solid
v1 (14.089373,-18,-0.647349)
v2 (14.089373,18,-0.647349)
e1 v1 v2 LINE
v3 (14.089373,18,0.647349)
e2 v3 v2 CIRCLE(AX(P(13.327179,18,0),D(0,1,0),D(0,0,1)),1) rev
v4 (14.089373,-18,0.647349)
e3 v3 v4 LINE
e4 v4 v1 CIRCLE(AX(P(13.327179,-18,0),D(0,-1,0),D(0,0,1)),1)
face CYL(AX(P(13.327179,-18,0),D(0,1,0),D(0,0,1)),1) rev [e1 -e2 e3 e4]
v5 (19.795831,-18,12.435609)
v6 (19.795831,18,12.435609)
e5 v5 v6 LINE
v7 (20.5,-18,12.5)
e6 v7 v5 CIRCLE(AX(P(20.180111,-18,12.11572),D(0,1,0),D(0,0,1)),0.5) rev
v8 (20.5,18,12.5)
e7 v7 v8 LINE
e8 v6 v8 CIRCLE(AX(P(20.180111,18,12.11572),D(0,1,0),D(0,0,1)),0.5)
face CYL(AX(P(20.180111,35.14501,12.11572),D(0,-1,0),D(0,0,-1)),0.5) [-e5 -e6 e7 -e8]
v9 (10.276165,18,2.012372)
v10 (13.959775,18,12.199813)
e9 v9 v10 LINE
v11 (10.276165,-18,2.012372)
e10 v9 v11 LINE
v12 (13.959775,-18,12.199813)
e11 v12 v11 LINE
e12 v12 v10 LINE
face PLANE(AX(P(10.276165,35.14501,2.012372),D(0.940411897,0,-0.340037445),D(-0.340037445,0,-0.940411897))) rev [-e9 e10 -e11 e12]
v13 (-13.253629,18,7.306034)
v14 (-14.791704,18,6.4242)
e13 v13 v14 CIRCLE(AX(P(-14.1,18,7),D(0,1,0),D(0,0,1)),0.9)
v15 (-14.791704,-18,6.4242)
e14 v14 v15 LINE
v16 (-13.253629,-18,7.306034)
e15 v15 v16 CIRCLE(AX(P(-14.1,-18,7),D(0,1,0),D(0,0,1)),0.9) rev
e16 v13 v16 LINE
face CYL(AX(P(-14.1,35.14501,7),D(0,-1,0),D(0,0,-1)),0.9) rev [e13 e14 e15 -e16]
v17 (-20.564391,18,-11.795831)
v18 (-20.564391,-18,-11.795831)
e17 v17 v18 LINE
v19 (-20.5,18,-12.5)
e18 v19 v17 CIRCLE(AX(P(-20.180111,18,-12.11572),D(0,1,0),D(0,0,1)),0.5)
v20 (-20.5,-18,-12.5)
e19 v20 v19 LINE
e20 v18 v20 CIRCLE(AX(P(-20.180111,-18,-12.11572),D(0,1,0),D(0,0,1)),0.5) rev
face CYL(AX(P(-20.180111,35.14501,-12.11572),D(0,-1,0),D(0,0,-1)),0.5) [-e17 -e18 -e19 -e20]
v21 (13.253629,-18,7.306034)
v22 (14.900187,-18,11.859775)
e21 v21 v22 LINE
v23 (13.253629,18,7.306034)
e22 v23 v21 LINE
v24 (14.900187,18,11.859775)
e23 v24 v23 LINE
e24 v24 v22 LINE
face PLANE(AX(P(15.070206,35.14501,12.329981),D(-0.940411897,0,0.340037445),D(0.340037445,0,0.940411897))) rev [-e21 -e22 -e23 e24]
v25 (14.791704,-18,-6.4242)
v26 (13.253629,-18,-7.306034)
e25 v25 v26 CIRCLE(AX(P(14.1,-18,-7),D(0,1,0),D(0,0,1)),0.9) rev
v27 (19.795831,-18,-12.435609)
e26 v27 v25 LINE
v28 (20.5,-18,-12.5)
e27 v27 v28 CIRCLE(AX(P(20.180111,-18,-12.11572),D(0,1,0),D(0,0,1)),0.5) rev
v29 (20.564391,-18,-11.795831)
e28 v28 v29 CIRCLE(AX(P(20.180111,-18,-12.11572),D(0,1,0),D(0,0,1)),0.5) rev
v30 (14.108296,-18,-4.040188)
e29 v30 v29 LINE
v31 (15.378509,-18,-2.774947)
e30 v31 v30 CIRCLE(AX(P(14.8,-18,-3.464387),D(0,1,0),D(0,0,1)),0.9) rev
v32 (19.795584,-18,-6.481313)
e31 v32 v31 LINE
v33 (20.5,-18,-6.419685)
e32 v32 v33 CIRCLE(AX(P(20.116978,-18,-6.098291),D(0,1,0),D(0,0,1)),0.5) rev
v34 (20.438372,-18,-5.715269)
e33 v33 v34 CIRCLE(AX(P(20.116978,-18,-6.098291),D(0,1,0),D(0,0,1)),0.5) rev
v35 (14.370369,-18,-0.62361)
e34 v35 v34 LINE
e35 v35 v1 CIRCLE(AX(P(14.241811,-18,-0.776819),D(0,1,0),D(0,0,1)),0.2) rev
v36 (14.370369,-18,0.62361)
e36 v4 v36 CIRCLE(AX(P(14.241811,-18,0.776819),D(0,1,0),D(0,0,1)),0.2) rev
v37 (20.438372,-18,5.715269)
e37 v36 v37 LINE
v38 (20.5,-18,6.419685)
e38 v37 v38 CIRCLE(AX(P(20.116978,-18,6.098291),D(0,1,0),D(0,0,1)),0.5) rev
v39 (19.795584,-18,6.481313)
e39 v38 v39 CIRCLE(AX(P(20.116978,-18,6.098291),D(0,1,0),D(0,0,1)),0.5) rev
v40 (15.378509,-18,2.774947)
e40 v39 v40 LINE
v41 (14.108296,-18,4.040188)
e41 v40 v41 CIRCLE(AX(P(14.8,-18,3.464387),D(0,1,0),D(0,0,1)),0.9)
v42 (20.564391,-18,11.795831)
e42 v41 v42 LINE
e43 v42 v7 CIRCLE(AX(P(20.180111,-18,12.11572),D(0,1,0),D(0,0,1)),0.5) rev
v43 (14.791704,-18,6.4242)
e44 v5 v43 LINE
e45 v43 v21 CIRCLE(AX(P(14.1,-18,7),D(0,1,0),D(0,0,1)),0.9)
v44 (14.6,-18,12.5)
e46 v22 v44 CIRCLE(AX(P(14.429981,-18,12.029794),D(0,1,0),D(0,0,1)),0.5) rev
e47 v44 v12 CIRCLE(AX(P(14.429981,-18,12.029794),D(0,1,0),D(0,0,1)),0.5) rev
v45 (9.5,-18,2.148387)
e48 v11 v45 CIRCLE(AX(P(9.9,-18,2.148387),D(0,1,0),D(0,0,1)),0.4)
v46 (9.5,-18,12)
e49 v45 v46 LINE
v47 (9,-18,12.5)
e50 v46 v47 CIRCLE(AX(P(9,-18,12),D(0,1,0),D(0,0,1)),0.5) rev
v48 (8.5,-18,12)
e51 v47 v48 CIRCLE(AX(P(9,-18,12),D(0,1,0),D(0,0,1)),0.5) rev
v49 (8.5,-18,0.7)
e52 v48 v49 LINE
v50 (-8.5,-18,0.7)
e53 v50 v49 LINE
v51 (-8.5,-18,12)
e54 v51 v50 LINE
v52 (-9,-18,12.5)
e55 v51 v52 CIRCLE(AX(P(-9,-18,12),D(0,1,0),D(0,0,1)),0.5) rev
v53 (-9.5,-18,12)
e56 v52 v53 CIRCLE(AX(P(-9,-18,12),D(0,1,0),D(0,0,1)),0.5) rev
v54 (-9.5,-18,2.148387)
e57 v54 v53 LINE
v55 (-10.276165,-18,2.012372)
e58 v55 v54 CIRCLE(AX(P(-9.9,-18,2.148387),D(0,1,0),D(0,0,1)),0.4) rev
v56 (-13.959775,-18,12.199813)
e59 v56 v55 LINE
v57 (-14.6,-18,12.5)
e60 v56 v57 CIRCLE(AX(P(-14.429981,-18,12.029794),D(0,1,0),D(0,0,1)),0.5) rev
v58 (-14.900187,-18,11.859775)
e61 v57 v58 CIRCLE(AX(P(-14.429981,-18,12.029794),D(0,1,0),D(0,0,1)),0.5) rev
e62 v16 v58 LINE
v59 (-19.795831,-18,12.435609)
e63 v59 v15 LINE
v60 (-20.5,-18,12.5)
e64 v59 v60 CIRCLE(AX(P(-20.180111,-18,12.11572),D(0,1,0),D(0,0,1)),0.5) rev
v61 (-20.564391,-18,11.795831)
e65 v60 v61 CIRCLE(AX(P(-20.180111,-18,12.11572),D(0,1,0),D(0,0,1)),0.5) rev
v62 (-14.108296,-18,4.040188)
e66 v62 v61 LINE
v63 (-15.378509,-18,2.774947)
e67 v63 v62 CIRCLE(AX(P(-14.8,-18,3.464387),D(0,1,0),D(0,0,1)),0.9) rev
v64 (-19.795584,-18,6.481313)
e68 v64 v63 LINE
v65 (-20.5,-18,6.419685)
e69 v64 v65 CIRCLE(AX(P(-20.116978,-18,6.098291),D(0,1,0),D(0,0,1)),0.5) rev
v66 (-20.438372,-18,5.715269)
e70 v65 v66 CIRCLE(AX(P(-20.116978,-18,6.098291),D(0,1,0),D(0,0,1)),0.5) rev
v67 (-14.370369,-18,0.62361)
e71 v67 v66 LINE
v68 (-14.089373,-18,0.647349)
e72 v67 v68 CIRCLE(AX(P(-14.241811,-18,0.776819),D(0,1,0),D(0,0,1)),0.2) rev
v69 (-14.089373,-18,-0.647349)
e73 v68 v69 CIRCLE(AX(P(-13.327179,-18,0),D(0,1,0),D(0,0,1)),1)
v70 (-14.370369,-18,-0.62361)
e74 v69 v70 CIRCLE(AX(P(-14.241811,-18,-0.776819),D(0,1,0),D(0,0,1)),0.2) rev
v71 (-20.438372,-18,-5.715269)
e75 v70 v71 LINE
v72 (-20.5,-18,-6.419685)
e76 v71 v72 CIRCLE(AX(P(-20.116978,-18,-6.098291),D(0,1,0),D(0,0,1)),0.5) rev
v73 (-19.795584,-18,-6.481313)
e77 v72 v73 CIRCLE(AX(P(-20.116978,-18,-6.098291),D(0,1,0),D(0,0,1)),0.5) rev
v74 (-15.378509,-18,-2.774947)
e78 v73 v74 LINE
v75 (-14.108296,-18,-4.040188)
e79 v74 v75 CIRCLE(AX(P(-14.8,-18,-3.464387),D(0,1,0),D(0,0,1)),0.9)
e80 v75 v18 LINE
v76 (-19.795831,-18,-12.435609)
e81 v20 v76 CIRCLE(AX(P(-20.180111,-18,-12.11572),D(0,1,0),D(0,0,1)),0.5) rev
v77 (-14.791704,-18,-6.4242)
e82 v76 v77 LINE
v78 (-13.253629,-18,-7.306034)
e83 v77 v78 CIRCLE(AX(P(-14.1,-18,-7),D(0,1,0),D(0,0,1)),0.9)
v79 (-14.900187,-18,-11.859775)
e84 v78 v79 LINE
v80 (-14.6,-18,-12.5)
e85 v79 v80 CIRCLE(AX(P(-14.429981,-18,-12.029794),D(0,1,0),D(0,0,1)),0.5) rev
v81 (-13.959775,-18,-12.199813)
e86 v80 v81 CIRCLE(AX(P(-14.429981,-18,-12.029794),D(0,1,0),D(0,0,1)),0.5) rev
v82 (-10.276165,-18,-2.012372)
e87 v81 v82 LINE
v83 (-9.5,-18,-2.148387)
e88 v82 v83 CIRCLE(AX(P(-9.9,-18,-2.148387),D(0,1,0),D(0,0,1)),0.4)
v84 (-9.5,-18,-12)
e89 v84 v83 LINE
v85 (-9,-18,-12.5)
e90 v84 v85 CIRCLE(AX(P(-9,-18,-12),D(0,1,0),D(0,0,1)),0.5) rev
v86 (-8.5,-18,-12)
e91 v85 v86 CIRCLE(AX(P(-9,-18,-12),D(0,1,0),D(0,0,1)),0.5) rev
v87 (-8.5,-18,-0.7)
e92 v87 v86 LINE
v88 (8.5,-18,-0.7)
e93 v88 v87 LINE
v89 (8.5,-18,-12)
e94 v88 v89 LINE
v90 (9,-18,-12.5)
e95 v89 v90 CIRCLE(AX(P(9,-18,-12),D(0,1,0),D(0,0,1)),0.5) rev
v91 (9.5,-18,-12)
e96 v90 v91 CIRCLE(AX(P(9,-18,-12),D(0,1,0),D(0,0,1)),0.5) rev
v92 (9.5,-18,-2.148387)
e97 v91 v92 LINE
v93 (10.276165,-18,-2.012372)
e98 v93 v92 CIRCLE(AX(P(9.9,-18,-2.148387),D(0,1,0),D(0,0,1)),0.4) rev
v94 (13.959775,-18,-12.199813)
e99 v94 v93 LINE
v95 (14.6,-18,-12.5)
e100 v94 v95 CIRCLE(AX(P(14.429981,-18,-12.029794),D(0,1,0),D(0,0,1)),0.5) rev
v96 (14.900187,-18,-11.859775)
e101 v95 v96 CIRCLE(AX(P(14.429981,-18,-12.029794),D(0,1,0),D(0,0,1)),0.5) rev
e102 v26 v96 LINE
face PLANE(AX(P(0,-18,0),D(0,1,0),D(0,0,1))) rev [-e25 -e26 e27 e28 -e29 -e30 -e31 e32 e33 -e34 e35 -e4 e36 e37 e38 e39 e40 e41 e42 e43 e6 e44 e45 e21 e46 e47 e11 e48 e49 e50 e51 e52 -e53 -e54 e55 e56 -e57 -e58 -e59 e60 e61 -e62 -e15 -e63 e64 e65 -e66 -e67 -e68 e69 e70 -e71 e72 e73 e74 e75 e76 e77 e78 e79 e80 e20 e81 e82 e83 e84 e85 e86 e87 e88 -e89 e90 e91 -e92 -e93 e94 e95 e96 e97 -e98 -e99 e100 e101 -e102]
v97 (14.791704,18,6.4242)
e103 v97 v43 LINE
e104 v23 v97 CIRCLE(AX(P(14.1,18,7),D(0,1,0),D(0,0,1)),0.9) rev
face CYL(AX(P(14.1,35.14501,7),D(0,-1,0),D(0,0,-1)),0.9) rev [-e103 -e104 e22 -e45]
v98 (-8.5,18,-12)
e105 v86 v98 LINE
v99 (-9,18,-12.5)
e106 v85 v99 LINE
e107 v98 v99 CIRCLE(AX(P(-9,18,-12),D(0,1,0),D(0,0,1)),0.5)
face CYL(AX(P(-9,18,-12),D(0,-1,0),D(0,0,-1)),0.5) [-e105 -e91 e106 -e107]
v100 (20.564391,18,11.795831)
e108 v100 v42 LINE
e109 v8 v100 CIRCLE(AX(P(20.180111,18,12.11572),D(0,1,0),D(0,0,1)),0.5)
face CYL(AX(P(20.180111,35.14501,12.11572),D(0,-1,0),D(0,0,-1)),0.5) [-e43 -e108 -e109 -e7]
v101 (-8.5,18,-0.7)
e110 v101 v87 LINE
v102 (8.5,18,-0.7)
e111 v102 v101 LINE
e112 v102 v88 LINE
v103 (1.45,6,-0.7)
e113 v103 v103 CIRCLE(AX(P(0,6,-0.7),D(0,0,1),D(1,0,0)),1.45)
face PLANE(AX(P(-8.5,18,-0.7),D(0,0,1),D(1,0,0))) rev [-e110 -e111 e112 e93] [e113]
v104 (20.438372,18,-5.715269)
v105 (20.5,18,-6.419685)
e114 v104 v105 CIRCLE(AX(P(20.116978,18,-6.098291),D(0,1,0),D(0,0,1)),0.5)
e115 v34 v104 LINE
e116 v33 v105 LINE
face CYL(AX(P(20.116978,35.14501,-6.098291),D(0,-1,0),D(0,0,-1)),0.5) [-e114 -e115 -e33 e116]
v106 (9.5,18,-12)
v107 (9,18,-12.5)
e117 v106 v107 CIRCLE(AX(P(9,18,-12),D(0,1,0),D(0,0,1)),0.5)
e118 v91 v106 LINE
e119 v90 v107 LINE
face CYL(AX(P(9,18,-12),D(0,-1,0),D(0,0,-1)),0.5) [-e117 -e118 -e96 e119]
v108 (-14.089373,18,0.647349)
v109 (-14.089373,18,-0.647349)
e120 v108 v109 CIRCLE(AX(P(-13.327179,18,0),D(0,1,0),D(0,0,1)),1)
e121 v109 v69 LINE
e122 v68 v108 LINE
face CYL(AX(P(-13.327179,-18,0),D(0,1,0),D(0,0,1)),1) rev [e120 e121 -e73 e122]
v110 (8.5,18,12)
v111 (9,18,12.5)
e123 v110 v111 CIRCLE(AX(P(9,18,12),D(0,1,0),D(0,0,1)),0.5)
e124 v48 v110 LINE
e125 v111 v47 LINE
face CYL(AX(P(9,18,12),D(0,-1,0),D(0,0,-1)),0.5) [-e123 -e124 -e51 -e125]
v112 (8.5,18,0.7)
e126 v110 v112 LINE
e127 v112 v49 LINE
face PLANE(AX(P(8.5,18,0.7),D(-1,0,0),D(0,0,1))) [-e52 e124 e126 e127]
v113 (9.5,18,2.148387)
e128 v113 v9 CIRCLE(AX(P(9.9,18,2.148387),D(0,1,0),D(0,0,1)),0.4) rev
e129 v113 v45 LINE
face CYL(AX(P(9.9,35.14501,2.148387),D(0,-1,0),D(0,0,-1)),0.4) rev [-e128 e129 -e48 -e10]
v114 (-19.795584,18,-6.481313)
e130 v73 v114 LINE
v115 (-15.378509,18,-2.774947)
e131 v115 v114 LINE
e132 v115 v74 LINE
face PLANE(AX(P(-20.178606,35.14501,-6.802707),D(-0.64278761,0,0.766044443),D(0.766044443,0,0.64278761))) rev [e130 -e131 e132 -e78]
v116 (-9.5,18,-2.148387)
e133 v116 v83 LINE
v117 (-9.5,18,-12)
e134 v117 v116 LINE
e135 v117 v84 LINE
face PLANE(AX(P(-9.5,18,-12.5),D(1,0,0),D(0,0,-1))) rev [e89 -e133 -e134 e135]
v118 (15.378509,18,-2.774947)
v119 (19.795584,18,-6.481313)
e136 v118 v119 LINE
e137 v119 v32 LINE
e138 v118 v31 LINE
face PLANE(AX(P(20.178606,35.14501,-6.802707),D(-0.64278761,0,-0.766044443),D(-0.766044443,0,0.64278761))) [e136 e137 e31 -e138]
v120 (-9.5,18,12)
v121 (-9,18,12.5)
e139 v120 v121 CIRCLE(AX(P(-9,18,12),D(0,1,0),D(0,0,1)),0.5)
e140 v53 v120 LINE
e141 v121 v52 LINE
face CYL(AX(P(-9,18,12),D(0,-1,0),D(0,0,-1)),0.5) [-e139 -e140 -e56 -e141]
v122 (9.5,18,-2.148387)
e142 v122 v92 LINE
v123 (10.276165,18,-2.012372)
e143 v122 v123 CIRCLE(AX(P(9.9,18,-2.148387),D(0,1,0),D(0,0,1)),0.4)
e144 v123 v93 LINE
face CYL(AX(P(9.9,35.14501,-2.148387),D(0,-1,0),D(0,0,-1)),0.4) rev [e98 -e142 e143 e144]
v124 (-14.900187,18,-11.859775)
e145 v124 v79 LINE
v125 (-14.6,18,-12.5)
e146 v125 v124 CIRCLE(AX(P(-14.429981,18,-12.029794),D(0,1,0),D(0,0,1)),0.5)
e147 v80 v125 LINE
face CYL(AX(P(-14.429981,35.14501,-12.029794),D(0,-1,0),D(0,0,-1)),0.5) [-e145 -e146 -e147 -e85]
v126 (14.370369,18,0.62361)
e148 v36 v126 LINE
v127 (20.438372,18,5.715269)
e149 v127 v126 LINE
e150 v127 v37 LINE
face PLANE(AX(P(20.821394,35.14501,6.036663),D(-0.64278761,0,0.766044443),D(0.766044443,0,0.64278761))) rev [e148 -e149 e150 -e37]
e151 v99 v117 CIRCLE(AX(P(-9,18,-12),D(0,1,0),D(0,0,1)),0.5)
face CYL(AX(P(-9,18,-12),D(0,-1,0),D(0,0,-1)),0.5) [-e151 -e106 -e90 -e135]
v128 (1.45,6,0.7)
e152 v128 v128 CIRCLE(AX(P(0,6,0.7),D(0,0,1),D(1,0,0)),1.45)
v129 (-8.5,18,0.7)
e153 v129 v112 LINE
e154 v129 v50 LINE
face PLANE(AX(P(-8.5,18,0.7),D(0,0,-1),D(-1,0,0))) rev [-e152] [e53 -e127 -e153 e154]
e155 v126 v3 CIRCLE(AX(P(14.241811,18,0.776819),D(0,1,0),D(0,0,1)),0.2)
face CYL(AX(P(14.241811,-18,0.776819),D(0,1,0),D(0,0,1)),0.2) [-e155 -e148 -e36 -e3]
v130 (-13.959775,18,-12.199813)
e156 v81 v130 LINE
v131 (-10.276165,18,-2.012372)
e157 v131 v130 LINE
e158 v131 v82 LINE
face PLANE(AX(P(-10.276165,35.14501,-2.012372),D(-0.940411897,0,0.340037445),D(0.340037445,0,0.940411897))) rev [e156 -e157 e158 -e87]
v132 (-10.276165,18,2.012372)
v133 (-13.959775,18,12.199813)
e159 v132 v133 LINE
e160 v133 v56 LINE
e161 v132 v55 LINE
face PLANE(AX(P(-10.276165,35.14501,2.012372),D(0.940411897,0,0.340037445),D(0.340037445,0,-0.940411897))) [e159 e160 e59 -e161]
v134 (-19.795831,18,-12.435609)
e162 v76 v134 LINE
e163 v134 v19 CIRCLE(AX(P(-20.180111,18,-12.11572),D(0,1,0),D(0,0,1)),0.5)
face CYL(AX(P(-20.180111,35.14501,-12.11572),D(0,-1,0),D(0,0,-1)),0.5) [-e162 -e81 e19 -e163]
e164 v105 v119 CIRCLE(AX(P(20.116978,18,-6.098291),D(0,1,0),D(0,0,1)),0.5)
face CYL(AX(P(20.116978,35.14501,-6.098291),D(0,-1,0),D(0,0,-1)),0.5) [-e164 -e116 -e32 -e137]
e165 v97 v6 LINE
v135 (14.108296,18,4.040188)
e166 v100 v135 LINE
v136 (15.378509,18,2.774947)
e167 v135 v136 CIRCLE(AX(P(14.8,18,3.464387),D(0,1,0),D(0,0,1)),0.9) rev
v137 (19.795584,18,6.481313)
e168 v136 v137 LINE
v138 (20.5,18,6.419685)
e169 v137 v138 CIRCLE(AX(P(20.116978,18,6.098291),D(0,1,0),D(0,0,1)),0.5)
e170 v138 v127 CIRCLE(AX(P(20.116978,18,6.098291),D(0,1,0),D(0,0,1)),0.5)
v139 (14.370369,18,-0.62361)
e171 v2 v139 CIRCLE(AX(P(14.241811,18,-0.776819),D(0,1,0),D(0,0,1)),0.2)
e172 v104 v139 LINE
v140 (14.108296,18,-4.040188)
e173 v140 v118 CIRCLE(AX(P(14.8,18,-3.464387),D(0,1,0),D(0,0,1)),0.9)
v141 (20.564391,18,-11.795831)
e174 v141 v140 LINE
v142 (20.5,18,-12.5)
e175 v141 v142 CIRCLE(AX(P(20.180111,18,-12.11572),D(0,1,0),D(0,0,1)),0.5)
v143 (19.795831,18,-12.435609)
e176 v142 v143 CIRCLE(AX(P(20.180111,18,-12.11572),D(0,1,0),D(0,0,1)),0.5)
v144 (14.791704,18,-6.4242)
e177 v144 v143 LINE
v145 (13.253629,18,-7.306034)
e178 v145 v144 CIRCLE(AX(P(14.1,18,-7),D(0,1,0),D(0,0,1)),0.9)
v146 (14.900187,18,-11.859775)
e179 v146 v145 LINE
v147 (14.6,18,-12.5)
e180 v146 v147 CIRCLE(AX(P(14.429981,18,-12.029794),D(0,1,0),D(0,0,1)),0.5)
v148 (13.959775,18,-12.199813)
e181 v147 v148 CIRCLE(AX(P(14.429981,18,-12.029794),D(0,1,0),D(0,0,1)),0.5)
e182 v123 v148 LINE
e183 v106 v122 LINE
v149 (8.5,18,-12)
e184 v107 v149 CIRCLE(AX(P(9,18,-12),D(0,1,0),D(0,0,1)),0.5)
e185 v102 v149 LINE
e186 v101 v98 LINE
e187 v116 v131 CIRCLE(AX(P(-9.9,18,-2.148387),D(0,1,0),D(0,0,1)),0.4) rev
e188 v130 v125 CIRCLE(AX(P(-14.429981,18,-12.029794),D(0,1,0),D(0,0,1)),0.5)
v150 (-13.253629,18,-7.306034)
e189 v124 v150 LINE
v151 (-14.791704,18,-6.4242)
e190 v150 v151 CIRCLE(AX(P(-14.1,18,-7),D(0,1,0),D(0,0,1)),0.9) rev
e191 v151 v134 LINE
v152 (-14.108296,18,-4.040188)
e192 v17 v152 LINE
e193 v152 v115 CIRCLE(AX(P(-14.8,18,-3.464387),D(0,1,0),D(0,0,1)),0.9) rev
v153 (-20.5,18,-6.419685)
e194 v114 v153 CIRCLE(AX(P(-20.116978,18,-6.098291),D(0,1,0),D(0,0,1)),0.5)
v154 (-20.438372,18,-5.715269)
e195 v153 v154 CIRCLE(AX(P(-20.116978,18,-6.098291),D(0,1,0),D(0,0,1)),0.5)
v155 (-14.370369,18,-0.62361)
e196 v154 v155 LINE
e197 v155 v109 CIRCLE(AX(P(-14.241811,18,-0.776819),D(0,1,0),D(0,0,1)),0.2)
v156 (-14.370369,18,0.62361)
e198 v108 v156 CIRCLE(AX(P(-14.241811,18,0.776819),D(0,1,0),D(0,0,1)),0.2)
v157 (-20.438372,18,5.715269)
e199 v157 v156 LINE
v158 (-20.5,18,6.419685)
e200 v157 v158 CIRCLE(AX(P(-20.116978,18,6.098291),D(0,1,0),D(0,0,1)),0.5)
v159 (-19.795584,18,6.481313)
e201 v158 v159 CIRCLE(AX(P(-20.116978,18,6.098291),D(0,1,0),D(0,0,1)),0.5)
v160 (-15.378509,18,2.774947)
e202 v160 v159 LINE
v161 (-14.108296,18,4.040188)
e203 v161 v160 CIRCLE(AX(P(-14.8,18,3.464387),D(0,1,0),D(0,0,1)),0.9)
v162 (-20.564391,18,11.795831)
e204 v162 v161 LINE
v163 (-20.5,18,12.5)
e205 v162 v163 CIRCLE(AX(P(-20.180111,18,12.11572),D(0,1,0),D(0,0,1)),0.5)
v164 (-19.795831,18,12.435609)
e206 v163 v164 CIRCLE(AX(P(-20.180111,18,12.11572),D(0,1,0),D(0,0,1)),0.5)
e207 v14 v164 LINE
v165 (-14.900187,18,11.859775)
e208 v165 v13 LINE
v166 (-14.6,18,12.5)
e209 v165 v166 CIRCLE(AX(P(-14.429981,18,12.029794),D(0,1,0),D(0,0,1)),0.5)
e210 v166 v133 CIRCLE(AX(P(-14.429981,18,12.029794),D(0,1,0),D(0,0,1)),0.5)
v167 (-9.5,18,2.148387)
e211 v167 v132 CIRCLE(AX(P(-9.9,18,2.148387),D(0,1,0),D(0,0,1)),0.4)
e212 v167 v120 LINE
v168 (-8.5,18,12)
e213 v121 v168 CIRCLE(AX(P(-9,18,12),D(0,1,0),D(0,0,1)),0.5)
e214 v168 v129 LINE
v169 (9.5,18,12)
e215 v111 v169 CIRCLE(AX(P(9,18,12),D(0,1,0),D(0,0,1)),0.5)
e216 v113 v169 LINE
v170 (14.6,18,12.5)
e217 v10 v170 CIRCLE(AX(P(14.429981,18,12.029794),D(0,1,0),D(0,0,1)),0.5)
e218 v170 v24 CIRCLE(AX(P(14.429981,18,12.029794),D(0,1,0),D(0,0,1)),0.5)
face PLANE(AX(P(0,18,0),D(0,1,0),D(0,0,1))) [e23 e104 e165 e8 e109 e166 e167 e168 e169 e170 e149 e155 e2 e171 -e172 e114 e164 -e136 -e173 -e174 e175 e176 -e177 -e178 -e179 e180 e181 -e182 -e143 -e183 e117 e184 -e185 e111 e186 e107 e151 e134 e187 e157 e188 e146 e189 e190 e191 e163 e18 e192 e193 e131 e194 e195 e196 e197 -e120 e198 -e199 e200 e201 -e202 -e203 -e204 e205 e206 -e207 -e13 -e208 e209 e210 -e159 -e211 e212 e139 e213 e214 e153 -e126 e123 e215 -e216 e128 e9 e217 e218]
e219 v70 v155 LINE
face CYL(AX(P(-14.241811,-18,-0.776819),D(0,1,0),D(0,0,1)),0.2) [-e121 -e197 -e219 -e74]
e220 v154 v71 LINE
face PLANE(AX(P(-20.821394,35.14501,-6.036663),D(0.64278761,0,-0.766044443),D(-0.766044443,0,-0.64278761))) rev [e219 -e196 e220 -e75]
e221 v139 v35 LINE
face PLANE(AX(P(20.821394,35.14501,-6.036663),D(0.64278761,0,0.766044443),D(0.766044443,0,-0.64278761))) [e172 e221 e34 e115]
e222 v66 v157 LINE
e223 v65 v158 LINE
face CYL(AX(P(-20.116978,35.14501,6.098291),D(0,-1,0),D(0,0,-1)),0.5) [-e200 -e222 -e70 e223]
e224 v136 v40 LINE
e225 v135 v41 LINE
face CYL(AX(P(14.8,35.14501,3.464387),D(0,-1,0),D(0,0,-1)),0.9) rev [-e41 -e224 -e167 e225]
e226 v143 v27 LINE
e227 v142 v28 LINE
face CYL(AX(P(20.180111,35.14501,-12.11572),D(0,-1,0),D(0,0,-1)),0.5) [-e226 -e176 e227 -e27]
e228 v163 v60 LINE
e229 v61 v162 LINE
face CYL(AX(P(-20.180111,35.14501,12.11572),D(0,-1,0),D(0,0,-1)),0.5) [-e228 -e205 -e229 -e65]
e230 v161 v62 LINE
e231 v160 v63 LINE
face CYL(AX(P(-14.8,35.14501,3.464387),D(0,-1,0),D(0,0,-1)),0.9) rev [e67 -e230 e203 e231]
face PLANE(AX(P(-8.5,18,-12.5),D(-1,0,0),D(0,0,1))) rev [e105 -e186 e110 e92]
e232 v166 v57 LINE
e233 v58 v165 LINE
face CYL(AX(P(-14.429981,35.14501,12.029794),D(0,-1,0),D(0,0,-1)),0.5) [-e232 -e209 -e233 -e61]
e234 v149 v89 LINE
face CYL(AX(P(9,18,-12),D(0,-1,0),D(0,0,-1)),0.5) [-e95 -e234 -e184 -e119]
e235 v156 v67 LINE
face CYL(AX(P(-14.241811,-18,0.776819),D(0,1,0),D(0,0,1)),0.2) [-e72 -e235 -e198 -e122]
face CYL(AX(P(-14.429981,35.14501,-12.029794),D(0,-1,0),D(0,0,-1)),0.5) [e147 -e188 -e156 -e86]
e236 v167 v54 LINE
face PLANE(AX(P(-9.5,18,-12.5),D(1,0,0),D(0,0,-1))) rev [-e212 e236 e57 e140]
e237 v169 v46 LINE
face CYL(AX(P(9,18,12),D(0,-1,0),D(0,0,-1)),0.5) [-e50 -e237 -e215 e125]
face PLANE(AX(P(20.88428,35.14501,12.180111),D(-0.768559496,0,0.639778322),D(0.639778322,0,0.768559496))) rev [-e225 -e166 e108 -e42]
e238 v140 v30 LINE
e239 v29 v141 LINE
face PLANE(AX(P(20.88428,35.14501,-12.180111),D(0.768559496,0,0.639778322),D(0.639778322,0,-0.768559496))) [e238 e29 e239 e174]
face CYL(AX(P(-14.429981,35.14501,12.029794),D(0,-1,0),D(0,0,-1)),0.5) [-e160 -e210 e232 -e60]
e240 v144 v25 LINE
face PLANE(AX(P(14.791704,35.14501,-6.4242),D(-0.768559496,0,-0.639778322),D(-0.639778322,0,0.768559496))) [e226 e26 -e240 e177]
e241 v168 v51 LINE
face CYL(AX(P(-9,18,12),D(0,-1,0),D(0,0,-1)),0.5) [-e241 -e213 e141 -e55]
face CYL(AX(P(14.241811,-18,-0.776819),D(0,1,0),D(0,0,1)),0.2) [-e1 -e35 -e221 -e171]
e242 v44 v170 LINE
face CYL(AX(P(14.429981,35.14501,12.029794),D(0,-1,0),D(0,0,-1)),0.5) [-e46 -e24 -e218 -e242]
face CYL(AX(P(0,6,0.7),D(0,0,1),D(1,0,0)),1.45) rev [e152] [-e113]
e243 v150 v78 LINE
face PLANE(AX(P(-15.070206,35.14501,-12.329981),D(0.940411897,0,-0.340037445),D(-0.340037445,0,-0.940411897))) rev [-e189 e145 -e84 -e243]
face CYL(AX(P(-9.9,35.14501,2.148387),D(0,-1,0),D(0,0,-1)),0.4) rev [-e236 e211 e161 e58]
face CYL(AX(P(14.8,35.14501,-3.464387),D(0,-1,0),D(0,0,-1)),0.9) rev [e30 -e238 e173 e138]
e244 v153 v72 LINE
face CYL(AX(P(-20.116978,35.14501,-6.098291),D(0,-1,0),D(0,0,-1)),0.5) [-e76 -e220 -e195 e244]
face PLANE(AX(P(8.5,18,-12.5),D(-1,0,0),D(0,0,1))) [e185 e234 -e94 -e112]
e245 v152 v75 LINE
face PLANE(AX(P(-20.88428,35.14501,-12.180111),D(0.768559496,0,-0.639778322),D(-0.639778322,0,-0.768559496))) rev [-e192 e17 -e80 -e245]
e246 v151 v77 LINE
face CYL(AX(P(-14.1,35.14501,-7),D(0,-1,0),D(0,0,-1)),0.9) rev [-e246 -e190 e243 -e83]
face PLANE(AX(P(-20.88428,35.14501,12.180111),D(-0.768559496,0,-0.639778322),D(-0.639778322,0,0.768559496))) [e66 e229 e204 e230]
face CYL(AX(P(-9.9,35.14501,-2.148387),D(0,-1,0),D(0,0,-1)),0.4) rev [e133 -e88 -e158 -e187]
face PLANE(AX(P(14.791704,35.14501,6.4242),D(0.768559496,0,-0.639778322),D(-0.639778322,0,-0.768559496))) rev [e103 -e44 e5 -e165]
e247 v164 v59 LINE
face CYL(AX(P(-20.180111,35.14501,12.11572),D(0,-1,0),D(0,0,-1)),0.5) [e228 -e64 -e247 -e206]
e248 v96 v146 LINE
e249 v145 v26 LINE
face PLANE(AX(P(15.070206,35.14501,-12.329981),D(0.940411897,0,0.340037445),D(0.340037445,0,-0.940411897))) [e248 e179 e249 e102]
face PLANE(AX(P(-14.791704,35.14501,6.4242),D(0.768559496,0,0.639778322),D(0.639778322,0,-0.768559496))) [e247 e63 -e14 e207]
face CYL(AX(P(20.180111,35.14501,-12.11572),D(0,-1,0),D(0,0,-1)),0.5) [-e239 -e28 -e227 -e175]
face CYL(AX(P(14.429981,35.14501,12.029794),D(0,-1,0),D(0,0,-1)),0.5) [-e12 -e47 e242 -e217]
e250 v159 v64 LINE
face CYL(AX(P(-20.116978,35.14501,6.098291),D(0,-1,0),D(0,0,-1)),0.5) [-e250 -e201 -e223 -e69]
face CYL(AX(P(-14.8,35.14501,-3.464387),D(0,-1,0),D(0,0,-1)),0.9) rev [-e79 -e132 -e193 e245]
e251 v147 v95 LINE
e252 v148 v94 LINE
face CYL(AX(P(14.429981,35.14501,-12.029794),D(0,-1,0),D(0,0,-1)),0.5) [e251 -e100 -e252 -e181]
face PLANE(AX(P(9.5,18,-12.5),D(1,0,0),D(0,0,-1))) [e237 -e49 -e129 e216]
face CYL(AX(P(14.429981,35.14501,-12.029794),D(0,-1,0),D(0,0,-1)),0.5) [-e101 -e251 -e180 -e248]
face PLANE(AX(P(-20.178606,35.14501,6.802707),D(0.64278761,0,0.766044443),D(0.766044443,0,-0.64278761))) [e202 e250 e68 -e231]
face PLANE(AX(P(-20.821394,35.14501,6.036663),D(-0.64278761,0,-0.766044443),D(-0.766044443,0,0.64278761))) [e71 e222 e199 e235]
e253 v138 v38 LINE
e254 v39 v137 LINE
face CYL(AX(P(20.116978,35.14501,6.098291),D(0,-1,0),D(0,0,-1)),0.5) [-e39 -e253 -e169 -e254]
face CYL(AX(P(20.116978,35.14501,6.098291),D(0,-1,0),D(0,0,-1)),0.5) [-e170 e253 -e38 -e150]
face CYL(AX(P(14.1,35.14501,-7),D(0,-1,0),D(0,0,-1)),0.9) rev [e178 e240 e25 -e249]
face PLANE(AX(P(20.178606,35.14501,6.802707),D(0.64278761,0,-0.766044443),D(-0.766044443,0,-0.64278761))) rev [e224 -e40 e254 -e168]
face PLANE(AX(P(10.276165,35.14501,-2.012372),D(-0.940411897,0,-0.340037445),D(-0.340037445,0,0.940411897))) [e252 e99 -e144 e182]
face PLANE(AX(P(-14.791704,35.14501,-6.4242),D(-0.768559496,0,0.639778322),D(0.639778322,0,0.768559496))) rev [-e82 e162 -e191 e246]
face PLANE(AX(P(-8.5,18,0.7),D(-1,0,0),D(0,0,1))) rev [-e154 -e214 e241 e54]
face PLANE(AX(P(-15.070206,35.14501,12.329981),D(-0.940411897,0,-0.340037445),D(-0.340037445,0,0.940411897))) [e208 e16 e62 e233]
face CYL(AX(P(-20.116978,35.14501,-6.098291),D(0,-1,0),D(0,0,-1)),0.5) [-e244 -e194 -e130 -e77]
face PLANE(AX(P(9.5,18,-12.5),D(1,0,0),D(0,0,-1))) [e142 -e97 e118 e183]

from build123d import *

# Parameters (mm, degrees)
INNER_HALF_DEPTH          = 18
FLANGES_REACH             = 25.885
FLANGES_DIRECTION_2_REACH = 25.885
FILLET1_R                 = 0.5
FILLET1_OF_MIRROR1_R      = 0.5
MIRROR3_START             = -18
MIRROR3_DEPTH             = 36
SKETCH3_R                 = 1
INNER_CIRCLE_DEPTH        = 44.391544118
M3_5X0_6_TAPPED_HOLE1_D   = 2.9
FILLET3_R                 = 0.2
FILLET2_R                 = 0.5


# Read off the part's stored shape, not the designer's step: Mirror3
with BuildPart() as part:
    # Sketch1 → INNER HALF (new, symmetric)
    with BuildSketch(Plane(origin=(0, 0, 0), x_dir=(1, 0, 0), z_dir=(0, 1, 0))):
        Polygon((-8.5, 0.7), (0, 0.7), (0, -0.7), (-8.5, -0.7), (-8.5, -12.5), (-9.5, -12.5), (-9.5, 12.5), (-8.5, 12.5), align=None)
    inner_half = extrude(amount=INNER_HALF_DEPTH, both=True)

    # Mirror2: INNER HALF across plane
    add(inner_half.mirror(Plane(origin=(0, 0, 0), x_dir=(0, 0, 1), z_dir=(1, 0, 0))))

    # FLANGES: up to this face of the body (flat: up to its plane)
    flanges_end = Plane(part.part.faces().sort_by_distance((0, 18, 0))[0])
    # Sketch2 → FLANGES (add, up to the picked face)
    with BuildSketch(Plane(origin=(0, 0, 0), x_dir=(1, 0, 0), z_dir=(0, 1, 0)), mode=Mode.PRIVATE) as flanges_sk1:
        with BuildLine():
            Line((-10.276164759, 2.012372382), (-14.129794052, 12.670018723))
            Line((-14.129794052, 12.670018723), (-15.070205948, 12.329981277))
            Line((-15.070205948, 12.329981277), (-13.253629293, 7.306033701))
            ThreePointArc((-13.253629293, 7.306033701), (-13.652352407, 6.219223699), (-14.791703546, 6.42419951))
            Line((-14.791703546, 6.42419951), (-20.115720252, 12.819889161))
            Line((-20.115720252, 12.819889161), (-20.884279748, 12.180110839))
            Line((-20.884279748, 12.180110839), (-14.108296454, 4.040187803))
            ThreePointArc((-14.108296454, 4.040187803), (-14.164853061, 2.826744492), (-15.378508849, 2.774947314))
            Line((-15.378508849, 2.774947314), (-20.178606195, 6.802707227))
            Line((-20.178606195, 6.802707227), (-20.821393805, 6.036662784))
            Line((-20.821393805, 6.036662784), (-13.627179245, 0))
            Line((-13.627179245, 0), (-9.5, 0))
            Line((-9.5, 0), (-9.5, 2.14838736))
            ThreePointArc((-9.5, 2.14838736), (-9.830956186, 1.754391228), (-10.276164759, 2.012372382))
        make_face()
    flanges_tool1 = split(extrude(flanges_sk1.sketch, amount=FLANGES_REACH, mode=Mode.PRIVATE), bisect_by=flanges_end, keep=Keep.BOTH, mode=Mode.PRIVATE)
    flanges = flanges_tool1.solids().sort_by(Axis((-14.387215, 0, -5.095322), (0, 1, 0)))[0]
    add(flanges)

    # FLANGES direction 2: up to this face of the body (flat: up to its plane)
    flanges_direction_2_end = Plane(part.part.faces().sort_by_distance((0, -18, 0))[0])
    # Sketch2 → FLANGES direction 2 (add, up to the picked face)
    with BuildSketch(Plane(origin=(0, 0, 0), x_dir=(1, 0, 0), z_dir=(0, 1, 0)), mode=Mode.PRIVATE) as flanges_direction_2_sk1:
        with BuildLine():
            Line((-10.276164759, 2.012372382), (-14.129794052, 12.670018723))
            Line((-14.129794052, 12.670018723), (-15.070205948, 12.329981277))
            Line((-15.070205948, 12.329981277), (-13.253629293, 7.306033701))
            ThreePointArc((-13.253629293, 7.306033701), (-13.652352407, 6.219223699), (-14.791703546, 6.42419951))
            Line((-14.791703546, 6.42419951), (-20.115720252, 12.819889161))
            Line((-20.115720252, 12.819889161), (-20.884279748, 12.180110839))
            Line((-20.884279748, 12.180110839), (-14.108296454, 4.040187803))
            ThreePointArc((-14.108296454, 4.040187803), (-14.164853061, 2.826744492), (-15.378508849, 2.774947314))
            Line((-15.378508849, 2.774947314), (-20.178606195, 6.802707227))
            Line((-20.178606195, 6.802707227), (-20.821393805, 6.036662784))
            Line((-20.821393805, 6.036662784), (-13.627179245, 0))
            Line((-13.627179245, 0), (-9.5, 0))
            Line((-9.5, 0), (-9.5, 2.14838736))
            ThreePointArc((-9.5, 2.14838736), (-9.830956186, 1.754391228), (-10.276164759, 2.012372382))
        make_face()
    flanges_direction_2_tool1 = split(extrude(flanges_direction_2_sk1.sketch, amount=-FLANGES_DIRECTION_2_REACH, mode=Mode.PRIVATE), bisect_by=flanges_direction_2_end, keep=Keep.BOTH, mode=Mode.PRIVATE)
    flanges_direction_2 = flanges_direction_2_tool1.solids().sort_by(Axis((-14.387215, 0, -5.095322), (0, -1, 0)))[0]
    add(flanges_direction_2)

    # Fillet1
    fillet1_edges = [part.edges().sort_by_distance(p)[0] for p in [
        (-20.821393805, 0, -6.036662784),
        (-20.178606195, 0, -6.802707227),
        (-20.115720252, 0, -12.819889161),
        (-20.884279748, 0, -12.180110839),
        (-14.129794052, 0, -12.670018723),
        (-15.070205948, 0, -12.329981277),
    ]]
    fillet(fillet1_edges, radius=FILLET1_R - 0.0001)  # a hair under: the kernel refuses the full size

    # Mirror1: FLANGES, FLANGES direction 2 across plane
    add(flanges.mirror(Plane.XY))
    add(flanges_direction_2.mirror(Plane.XY))

    # Fillet1 of Mirror1
    fillet1_of_mirror1_edges = [part.edges().sort_by_distance(p)[0] for p in [
        (-20.821393805, 0, 6.036662784),
        (-20.178606195, 0, 6.802707227),
        (-20.115720252, 0, 12.819889161),
        (-20.884279748, 0, 12.180110839),
        (-14.129794052, 0, 12.670018723),
        (-15.070205948, 0, 12.329981277),
    ]]
    fillet(fillet1_of_mirror1_edges, radius=FILLET1_OF_MIRROR1_R - 0.0001)  # a hair under: the kernel refuses the full size

    # Mirror3 outline → Mirror3 (add)
    with BuildSketch(Plane(origin=(0, 0, 0), x_dir=(1, 0, 0), z_dir=(0, 1, 0)).offset(MIRROR3_START)):
        with BuildLine():
            ThreePointArc((14.6, 12.5), (14.217716854, 12.482501258), (13.959775329, 12.199812774))
            Line((13.959775329, 12.199812774), (10.276164759, 2.012372382))
            ThreePointArc((10.276164759, 2.012372382), (9.830956186, 1.754391228), (9.5, 2.14838736))
            Line((9.5, 2.14838736), (9.5, -2.14838736))
            ThreePointArc((9.5, -2.14838736), (9.830956186, -1.754391228), (10.276164759, -2.012372382))
            Line((10.276164759, -2.012372382), (13.959775329, -12.199812774))
            ThreePointArc((13.959775329, -12.199812774), (14.217716854, -12.482501258), (14.6, -12.5))
            ThreePointArc((14.6, -12.5), (14.882688484, -12.242058475), (14.900187226, -11.859775329))
            Line((14.900187226, -11.859775329), (13.253629293, -7.306033701))
            ThreePointArc((13.253629293, -7.306033701), (13.652352407, -6.219223699), (14.791703546, -6.42419951))
            Line((14.791703546, -6.42419951), (19.795831091, -12.435609413))
            ThreePointArc((19.795831091, -12.435609413), (20.134579818, -12.613642863), (20.5, -12.5))
            ThreePointArc((20.5, -12.5), (20.67803345, -12.161251273), (20.564390587, -11.795831091))
            Line((20.564390587, -11.795831091), (14.108296454, -4.040187803))
            ThreePointArc((14.108296454, -4.040187803), (14.164853061, -2.826744492), (15.378508849, -2.774947314))
            Line((15.378508849, -2.774947314), (19.795583974, -6.481313422))
            ThreePointArc((19.795583974, -6.481313422), (20.16055565, -6.59638855), (20.5, -6.419685006))
            ThreePointArc((20.5, -6.419685006), (20.615075127, -6.054713329), (20.438371583, -5.715268979))
            Line((20.438371583, -5.715268979), (13.627179245, 0))
            Line((13.627179245, 0), (20.438371583, 5.715268979))
            ThreePointArc((20.438371583, 5.715268979), (20.615075127, 6.054713329), (20.5, 6.419685006))
            ThreePointArc((20.5, 6.419685006), (20.16055565, 6.59638855), (19.795583974, 6.481313422))
            Line((19.795583974, 6.481313422), (15.378508849, 2.774947314))
            ThreePointArc((15.378508849, 2.774947314), (14.164853061, 2.826744492), (14.108296454, 4.040187803))
            Line((14.108296454, 4.040187803), (20.564390587, 11.795831091))
            ThreePointArc((20.564390587, 11.795831091), (20.67803345, 12.161251273), (20.5, 12.5))
            ThreePointArc((20.5, 12.5), (20.134579818, 12.613642863), (19.795831091, 12.435609413))
            Line((19.795831091, 12.435609413), (14.791703546, 6.42419951))
            ThreePointArc((14.791703546, 6.42419951), (13.652352407, 6.219223699), (13.253629293, 7.306033701))
            Line((13.253629293, 7.306033701), (14.900187226, 11.859775329))
            ThreePointArc((14.900187226, 11.859775329), (14.882688484, 12.242058475), (14.6, 12.5))
        make_face()
    extrude(amount=MIRROR3_DEPTH)

    # Sketch3 → INNER CIRCLE (cut, symmetric)
    with BuildSketch(Plane(origin=(0, 18, 0), x_dir=(1, 0, 0), z_dir=(0, 1, 0))):
        with Locations((-13.327179245, 0)):
            Circle(SKETCH3_R)
    inner_circle = extrude(amount=INNER_CIRCLE_DEPTH, both=True, mode=Mode.SUBTRACT)

    # Mirror6: INNER CIRCLE across plane
    add(inner_circle.mirror(Plane(origin=(0, 0, 0), x_dir=(0, 0, 1), z_dir=(1, 0, 0))), mode=Mode.SUBTRACT)

    # M3.5x0.6 Tapped Hole1 (through all)
    with Locations(Plane.XY.offset(0.7)):
        with Locations((0, 6)):
            Hole(M3_5X0_6_TAPPED_HOLE1_D / 2)

    # Fillet3
    fillet3_edges = [part.edges().sort_by_distance(p)[0] for p in [
        (-14.202798531, 0, 0.483001931),
        (-14.202798531, 0, -0.483001931),
        (14.202798531, 0, 0.483001931),
        (14.202798531, 0, -0.483001931),
    ]]
    fillet(fillet3_edges, radius=FILLET3_R)

    # Fillet2
    fillet2_edges = [part.edges().sort_by_distance(p)[0] for p in [
        (-8.5, 0, 12.5),
        (-9.5, 0, 12.5),
        (-8.5, 0, -12.5),
        (-9.5, 0, -12.5),
        (9.5, 0, 12.5),
        (8.5, 0, 12.5),
        (9.5, 0, -12.5),
        (8.5, 0, -12.5),
    ]]
    fillet(fillet2_edges, radius=FILLET2_R - 0.0001)  # a hair under: the kernel refuses the full size


solid = part.part
